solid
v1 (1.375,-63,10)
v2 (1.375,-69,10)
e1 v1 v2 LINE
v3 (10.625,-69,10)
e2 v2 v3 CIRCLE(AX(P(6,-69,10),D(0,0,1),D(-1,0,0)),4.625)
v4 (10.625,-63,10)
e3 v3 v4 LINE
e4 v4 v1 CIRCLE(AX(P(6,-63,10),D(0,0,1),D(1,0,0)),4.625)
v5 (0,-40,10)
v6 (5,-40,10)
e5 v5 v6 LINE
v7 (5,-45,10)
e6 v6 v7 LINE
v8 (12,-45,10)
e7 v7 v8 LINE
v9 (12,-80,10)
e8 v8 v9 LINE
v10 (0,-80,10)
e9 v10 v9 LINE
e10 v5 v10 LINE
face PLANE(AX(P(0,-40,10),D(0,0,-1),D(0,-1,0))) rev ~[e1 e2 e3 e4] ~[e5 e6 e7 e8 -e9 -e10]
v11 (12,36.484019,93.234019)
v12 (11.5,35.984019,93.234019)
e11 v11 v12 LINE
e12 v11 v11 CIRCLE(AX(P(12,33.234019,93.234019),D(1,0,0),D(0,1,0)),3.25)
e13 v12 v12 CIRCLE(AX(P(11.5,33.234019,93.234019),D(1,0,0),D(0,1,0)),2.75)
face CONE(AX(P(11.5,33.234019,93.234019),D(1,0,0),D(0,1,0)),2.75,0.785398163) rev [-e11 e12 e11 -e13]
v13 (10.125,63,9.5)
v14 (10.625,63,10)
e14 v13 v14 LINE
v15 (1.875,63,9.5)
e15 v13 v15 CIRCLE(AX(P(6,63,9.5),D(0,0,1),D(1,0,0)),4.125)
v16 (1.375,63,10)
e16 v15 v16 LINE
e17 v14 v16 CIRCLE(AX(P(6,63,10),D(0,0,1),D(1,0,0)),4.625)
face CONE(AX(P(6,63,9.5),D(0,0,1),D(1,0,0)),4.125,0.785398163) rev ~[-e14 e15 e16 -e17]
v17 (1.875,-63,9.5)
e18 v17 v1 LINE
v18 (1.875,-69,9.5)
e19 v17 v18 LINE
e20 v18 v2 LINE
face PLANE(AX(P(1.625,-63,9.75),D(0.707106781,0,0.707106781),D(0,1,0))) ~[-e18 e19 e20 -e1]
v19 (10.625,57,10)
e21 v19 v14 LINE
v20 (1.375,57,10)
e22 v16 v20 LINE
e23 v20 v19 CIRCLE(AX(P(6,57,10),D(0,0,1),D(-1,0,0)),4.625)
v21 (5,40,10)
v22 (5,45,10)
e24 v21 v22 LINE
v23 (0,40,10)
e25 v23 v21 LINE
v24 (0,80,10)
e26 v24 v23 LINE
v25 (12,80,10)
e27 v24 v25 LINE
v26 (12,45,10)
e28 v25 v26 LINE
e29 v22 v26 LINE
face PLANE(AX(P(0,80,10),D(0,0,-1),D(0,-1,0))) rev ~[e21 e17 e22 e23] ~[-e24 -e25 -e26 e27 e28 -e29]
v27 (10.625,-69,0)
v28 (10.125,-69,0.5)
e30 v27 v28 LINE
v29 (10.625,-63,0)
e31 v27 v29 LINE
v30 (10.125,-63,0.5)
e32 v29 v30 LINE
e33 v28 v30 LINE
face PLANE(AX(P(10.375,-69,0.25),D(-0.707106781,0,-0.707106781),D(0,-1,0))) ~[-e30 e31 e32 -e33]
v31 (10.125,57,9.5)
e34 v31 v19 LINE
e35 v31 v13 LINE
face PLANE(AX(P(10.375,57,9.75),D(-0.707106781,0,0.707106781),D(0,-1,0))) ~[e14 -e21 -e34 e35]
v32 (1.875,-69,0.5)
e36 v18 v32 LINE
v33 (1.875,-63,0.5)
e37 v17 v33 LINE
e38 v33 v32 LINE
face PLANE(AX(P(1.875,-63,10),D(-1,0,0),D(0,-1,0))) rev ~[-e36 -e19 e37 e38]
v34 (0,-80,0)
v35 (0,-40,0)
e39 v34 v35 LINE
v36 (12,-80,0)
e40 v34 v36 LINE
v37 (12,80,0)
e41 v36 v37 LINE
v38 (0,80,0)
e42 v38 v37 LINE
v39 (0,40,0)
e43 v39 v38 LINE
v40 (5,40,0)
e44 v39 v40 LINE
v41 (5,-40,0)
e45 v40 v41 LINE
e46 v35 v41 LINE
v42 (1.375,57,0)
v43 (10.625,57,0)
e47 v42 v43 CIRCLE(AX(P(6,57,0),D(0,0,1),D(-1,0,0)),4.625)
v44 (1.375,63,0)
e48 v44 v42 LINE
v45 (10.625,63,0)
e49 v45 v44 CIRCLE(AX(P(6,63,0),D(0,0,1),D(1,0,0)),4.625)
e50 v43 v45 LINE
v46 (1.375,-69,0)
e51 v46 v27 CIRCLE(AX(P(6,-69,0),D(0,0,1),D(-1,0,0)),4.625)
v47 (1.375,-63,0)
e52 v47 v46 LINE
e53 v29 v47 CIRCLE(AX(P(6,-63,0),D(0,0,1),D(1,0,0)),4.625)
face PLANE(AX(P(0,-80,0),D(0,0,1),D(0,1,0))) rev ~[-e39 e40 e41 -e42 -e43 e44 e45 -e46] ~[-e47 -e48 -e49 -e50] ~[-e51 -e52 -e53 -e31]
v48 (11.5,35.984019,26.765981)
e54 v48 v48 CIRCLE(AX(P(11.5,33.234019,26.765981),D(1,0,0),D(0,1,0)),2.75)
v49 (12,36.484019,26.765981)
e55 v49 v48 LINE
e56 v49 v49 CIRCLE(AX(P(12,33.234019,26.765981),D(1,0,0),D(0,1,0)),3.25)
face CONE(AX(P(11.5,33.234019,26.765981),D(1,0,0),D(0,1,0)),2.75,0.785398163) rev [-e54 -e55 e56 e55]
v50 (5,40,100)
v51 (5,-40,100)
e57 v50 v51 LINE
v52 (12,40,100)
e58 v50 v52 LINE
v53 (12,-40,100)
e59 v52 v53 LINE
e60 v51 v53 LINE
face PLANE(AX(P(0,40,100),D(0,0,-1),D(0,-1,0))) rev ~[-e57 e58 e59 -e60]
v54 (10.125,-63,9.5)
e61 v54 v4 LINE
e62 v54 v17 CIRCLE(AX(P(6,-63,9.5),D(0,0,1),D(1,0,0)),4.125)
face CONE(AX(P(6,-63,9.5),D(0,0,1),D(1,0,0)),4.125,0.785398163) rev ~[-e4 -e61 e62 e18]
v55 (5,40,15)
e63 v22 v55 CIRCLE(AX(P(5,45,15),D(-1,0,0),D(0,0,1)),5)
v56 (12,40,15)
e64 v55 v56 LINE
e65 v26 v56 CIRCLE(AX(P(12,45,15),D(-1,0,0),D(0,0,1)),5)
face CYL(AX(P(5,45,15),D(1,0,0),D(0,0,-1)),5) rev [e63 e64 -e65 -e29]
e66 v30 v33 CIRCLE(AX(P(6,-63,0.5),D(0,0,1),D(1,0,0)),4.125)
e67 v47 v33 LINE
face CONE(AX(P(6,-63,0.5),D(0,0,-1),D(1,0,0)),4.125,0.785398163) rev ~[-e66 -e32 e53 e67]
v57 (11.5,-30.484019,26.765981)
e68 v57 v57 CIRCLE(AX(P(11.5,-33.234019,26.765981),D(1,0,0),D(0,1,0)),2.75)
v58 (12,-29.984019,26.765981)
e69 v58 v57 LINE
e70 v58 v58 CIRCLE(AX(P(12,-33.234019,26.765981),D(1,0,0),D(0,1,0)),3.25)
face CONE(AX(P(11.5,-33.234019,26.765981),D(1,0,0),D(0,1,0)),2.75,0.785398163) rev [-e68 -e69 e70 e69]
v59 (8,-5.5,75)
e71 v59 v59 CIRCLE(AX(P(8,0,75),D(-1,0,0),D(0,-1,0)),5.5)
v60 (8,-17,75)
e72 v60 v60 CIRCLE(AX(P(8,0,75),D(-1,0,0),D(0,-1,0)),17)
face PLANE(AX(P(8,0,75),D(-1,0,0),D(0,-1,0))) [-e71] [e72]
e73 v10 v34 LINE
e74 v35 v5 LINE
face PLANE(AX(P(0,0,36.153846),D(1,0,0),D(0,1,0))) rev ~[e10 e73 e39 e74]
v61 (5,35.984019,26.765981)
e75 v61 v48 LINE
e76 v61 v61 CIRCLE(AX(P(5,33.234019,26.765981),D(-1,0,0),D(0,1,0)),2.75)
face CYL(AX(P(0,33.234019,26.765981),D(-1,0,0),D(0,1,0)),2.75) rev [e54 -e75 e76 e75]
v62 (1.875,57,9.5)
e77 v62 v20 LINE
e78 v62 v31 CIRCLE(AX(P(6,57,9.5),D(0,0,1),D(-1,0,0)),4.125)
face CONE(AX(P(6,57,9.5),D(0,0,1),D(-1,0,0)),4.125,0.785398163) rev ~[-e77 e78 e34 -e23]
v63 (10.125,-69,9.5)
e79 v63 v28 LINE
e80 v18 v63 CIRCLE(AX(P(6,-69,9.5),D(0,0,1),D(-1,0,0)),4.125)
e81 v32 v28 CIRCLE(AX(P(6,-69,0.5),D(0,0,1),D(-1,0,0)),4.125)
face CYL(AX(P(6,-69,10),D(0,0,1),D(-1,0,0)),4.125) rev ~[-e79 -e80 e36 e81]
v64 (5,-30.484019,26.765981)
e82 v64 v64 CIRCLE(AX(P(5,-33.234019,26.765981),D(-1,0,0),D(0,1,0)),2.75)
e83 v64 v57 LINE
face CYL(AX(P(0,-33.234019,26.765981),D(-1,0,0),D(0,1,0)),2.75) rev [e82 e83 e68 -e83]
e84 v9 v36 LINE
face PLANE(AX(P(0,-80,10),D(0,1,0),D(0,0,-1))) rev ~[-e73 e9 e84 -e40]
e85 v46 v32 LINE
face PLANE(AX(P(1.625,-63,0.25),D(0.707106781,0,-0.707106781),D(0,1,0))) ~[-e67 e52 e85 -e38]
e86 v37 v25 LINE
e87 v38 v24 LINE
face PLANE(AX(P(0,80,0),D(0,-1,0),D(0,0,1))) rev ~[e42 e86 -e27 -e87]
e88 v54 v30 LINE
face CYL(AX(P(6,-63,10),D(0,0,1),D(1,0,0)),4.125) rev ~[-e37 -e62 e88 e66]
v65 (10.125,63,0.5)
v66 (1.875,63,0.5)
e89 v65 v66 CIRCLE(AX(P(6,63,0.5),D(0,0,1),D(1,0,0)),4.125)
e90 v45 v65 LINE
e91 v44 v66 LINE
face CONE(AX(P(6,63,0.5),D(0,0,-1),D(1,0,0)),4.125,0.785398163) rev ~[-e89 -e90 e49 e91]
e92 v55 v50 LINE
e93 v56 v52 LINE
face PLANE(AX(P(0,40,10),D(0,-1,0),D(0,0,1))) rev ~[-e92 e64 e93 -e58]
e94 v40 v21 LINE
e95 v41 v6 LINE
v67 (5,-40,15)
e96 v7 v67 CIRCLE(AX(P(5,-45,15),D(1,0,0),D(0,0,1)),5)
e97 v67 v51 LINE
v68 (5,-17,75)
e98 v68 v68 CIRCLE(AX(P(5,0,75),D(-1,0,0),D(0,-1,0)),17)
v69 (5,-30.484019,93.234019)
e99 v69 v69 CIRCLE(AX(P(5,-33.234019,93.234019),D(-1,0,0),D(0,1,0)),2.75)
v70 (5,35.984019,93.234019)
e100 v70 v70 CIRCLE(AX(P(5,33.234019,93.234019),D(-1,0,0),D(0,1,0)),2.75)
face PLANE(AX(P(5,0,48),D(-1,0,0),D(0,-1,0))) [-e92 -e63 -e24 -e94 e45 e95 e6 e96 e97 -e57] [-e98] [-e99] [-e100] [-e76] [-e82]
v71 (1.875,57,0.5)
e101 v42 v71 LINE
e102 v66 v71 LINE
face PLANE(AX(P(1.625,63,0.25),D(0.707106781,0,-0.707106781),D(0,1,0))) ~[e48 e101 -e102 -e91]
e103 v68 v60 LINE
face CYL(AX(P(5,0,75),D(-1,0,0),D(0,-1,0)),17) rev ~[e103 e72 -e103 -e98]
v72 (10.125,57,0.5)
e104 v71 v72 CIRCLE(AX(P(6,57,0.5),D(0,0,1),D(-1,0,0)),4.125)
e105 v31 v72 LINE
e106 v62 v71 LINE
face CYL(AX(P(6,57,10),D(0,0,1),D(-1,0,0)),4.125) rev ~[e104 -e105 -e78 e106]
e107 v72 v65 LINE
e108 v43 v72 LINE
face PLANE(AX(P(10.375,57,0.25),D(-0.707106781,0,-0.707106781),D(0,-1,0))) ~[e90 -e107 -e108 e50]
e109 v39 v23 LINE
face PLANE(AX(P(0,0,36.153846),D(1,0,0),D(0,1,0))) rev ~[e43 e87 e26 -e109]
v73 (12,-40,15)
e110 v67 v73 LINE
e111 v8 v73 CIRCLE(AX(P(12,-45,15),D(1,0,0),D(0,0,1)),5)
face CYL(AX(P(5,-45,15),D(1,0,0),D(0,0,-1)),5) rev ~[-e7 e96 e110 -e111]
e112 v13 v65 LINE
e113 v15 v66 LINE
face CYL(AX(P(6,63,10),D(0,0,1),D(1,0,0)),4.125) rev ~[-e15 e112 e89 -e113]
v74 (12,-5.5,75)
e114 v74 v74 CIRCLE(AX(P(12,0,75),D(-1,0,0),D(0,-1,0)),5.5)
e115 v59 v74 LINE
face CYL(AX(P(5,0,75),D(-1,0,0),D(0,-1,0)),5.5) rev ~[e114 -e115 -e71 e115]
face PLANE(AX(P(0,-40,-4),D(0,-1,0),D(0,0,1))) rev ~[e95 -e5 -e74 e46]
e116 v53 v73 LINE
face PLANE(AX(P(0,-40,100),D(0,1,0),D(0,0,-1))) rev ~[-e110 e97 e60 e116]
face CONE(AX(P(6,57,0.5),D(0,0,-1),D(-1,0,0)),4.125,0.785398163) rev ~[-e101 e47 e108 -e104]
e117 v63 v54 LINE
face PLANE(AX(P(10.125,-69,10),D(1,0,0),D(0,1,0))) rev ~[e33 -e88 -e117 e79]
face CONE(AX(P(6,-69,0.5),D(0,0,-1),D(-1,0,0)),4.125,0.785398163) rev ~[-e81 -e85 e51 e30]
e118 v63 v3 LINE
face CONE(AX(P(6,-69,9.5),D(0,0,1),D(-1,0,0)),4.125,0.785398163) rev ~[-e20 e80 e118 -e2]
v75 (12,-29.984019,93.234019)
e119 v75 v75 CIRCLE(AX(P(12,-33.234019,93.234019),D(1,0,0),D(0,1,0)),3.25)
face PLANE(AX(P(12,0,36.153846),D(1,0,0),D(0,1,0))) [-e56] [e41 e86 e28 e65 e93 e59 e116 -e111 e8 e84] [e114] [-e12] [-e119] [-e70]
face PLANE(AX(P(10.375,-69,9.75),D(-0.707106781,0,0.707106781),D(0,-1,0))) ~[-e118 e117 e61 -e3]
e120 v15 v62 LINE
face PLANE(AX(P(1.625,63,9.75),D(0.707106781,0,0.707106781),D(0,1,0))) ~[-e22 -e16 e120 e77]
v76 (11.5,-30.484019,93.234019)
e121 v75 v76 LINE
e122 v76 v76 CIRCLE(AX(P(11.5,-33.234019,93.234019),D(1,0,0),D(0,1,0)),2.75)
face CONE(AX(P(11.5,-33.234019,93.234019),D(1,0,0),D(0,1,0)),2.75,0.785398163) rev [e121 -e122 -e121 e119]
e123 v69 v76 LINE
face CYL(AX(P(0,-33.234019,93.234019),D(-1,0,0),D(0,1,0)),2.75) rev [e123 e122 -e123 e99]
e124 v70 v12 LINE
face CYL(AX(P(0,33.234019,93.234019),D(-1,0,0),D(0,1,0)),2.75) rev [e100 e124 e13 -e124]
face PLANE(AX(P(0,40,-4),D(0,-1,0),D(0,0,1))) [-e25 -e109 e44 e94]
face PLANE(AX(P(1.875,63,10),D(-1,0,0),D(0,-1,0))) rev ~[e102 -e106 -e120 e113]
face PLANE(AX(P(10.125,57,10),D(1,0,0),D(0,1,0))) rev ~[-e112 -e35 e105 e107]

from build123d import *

# Parameters (mm, degrees)
F0_R      = 2.75
F1_DEPTH  = 12
F3_DEPTH  = 10.001
F4_SIZE   = 0.5
F5_SIZE   = 0.5
F6_W      = 80
F6_H      = 104
F7_DEPTH  = 5
F8_R      = 17
F8_R_2    = 5.5
F9_DEPTH  = 3
F10_R     = 5
F11_DEPTH = 7.001


with BuildPart() as f1:
    # F0 (on Right) → F1 (new body)
    with BuildSketch(Plane.YZ):
        Polygon((-80, 0), (0, 0), (80, 0), (80, 10), (40, 10), (40, 100), (0, 100), (-40, 100), (-40, 10), (-80, 10), align=None)
        with Locations((-33.2340187158, 26.7659812842)):
            Circle(F0_R, mode=Mode.SUBTRACT)
        with Locations((33.2340187158, 26.7659812842)):
            Circle(F0_R, mode=Mode.SUBTRACT)
        with Locations((-33.2340187158, 93.2340187158)):
            Circle(F0_R, mode=Mode.SUBTRACT)
        with Locations((33.2340187158, 93.2340187158)):
            Circle(F0_R, mode=Mode.SUBTRACT)
    extrude(amount=F1_DEPTH)

    # F2 (on face) → F3 (cut, through all)
    with BuildSketch(Plane.XY.offset(10)):
        with BuildLine():
            Line((10.125, 57), (10.125, 63))
            ThreePointArc((10.125, 63), (6, 67.125), (1.875, 63))
            Line((1.875, 63), (1.875, 57))
            ThreePointArc((1.875, 57), (6, 52.875), (10.125, 57))
        make_face()
        with BuildLine():
            Line((10.125, -69), (10.125, -63))
            ThreePointArc((10.125, -63), (6, -58.875), (1.875, -63))
            Line((1.875, -63), (1.875, -69))
            ThreePointArc((1.875, -69), (6, -73.125), (10.125, -69))
        make_face()
    extrude(amount=-F3_DEPTH, mode=Mode.SUBTRACT)

    # F4
    f4_edges = [f1.edges().sort_by_distance(p)[0] for p in [
        (6, 52.875, 10),
        (10.125, 57, 5),
        (6, 52.875, 0),
        (1.875, 57, 5),
        (6, -58.875, 10),
        (1.875, -63, 5),
        (6, -58.875, 0),
        (10.125, -63, 5),
    ]]
    chamfer(f4_edges, length=F4_SIZE)

    # F5
    f5_edges = [f1.edges().sort_by_distance(p)[0] for p in [
        (6, -30.484019, 93.234019),
        (0, -35.984019, 93.234019),
        (12, -35.984019, 93.234019),
        (6, 35.984019, 93.234019),
        (0, 30.484019, 93.234019),
        (12, 30.484019, 93.234019),
        (6, -30.484019, 26.765981),
        (0, -35.984019, 26.765981),
        (12, -35.984019, 26.765981),
        (6, 35.984019, 26.765981),
        (0, 30.484019, 26.765981),
        (12, 30.484019, 26.765981),
    ]]
    chamfer(f5_edges, length=F5_SIZE)

    # F6 (on face) → F7 (cut)
    with BuildSketch(Plane(origin=(0, 0, 0), x_dir=(0, -1, 0), z_dir=(-1, 0, 0))):
        with Locations((0, 48)):
            Rectangle(F6_W, F6_H)
    extrude(amount=-F7_DEPTH, mode=Mode.SUBTRACT)

    # F8 (on face) → F9 (cut)
    with BuildSketch(Plane(origin=(5, 0, 0), x_dir=(0, -1, 0), z_dir=(-1, 0, 0))):
        with Locations((0, 75)):
            Circle(F8_R)
        with Locations((0, 75)):
            Circle(F8_R_2, mode=Mode.SUBTRACT)
    extrude(amount=-F9_DEPTH, mode=Mode.SUBTRACT)

    # F10
    f10_edges = [f1.edges().sort_by_distance(p)[0] for p in [
        (8.5, 40, 10),
        (8.5, -40, 10),
    ]]
    fillet(f10_edges, radius=F10_R)

    # F11 (cut, through all): a face of the model
    f11_faces = [f1.faces().sort_by_distance(p)[0] for p in [
        (5, 0, 75),
    ]]
    extrude(f11_faces, amount=-F11_DEPTH, mode=Mode.SUBTRACT)


solid = f1.part
